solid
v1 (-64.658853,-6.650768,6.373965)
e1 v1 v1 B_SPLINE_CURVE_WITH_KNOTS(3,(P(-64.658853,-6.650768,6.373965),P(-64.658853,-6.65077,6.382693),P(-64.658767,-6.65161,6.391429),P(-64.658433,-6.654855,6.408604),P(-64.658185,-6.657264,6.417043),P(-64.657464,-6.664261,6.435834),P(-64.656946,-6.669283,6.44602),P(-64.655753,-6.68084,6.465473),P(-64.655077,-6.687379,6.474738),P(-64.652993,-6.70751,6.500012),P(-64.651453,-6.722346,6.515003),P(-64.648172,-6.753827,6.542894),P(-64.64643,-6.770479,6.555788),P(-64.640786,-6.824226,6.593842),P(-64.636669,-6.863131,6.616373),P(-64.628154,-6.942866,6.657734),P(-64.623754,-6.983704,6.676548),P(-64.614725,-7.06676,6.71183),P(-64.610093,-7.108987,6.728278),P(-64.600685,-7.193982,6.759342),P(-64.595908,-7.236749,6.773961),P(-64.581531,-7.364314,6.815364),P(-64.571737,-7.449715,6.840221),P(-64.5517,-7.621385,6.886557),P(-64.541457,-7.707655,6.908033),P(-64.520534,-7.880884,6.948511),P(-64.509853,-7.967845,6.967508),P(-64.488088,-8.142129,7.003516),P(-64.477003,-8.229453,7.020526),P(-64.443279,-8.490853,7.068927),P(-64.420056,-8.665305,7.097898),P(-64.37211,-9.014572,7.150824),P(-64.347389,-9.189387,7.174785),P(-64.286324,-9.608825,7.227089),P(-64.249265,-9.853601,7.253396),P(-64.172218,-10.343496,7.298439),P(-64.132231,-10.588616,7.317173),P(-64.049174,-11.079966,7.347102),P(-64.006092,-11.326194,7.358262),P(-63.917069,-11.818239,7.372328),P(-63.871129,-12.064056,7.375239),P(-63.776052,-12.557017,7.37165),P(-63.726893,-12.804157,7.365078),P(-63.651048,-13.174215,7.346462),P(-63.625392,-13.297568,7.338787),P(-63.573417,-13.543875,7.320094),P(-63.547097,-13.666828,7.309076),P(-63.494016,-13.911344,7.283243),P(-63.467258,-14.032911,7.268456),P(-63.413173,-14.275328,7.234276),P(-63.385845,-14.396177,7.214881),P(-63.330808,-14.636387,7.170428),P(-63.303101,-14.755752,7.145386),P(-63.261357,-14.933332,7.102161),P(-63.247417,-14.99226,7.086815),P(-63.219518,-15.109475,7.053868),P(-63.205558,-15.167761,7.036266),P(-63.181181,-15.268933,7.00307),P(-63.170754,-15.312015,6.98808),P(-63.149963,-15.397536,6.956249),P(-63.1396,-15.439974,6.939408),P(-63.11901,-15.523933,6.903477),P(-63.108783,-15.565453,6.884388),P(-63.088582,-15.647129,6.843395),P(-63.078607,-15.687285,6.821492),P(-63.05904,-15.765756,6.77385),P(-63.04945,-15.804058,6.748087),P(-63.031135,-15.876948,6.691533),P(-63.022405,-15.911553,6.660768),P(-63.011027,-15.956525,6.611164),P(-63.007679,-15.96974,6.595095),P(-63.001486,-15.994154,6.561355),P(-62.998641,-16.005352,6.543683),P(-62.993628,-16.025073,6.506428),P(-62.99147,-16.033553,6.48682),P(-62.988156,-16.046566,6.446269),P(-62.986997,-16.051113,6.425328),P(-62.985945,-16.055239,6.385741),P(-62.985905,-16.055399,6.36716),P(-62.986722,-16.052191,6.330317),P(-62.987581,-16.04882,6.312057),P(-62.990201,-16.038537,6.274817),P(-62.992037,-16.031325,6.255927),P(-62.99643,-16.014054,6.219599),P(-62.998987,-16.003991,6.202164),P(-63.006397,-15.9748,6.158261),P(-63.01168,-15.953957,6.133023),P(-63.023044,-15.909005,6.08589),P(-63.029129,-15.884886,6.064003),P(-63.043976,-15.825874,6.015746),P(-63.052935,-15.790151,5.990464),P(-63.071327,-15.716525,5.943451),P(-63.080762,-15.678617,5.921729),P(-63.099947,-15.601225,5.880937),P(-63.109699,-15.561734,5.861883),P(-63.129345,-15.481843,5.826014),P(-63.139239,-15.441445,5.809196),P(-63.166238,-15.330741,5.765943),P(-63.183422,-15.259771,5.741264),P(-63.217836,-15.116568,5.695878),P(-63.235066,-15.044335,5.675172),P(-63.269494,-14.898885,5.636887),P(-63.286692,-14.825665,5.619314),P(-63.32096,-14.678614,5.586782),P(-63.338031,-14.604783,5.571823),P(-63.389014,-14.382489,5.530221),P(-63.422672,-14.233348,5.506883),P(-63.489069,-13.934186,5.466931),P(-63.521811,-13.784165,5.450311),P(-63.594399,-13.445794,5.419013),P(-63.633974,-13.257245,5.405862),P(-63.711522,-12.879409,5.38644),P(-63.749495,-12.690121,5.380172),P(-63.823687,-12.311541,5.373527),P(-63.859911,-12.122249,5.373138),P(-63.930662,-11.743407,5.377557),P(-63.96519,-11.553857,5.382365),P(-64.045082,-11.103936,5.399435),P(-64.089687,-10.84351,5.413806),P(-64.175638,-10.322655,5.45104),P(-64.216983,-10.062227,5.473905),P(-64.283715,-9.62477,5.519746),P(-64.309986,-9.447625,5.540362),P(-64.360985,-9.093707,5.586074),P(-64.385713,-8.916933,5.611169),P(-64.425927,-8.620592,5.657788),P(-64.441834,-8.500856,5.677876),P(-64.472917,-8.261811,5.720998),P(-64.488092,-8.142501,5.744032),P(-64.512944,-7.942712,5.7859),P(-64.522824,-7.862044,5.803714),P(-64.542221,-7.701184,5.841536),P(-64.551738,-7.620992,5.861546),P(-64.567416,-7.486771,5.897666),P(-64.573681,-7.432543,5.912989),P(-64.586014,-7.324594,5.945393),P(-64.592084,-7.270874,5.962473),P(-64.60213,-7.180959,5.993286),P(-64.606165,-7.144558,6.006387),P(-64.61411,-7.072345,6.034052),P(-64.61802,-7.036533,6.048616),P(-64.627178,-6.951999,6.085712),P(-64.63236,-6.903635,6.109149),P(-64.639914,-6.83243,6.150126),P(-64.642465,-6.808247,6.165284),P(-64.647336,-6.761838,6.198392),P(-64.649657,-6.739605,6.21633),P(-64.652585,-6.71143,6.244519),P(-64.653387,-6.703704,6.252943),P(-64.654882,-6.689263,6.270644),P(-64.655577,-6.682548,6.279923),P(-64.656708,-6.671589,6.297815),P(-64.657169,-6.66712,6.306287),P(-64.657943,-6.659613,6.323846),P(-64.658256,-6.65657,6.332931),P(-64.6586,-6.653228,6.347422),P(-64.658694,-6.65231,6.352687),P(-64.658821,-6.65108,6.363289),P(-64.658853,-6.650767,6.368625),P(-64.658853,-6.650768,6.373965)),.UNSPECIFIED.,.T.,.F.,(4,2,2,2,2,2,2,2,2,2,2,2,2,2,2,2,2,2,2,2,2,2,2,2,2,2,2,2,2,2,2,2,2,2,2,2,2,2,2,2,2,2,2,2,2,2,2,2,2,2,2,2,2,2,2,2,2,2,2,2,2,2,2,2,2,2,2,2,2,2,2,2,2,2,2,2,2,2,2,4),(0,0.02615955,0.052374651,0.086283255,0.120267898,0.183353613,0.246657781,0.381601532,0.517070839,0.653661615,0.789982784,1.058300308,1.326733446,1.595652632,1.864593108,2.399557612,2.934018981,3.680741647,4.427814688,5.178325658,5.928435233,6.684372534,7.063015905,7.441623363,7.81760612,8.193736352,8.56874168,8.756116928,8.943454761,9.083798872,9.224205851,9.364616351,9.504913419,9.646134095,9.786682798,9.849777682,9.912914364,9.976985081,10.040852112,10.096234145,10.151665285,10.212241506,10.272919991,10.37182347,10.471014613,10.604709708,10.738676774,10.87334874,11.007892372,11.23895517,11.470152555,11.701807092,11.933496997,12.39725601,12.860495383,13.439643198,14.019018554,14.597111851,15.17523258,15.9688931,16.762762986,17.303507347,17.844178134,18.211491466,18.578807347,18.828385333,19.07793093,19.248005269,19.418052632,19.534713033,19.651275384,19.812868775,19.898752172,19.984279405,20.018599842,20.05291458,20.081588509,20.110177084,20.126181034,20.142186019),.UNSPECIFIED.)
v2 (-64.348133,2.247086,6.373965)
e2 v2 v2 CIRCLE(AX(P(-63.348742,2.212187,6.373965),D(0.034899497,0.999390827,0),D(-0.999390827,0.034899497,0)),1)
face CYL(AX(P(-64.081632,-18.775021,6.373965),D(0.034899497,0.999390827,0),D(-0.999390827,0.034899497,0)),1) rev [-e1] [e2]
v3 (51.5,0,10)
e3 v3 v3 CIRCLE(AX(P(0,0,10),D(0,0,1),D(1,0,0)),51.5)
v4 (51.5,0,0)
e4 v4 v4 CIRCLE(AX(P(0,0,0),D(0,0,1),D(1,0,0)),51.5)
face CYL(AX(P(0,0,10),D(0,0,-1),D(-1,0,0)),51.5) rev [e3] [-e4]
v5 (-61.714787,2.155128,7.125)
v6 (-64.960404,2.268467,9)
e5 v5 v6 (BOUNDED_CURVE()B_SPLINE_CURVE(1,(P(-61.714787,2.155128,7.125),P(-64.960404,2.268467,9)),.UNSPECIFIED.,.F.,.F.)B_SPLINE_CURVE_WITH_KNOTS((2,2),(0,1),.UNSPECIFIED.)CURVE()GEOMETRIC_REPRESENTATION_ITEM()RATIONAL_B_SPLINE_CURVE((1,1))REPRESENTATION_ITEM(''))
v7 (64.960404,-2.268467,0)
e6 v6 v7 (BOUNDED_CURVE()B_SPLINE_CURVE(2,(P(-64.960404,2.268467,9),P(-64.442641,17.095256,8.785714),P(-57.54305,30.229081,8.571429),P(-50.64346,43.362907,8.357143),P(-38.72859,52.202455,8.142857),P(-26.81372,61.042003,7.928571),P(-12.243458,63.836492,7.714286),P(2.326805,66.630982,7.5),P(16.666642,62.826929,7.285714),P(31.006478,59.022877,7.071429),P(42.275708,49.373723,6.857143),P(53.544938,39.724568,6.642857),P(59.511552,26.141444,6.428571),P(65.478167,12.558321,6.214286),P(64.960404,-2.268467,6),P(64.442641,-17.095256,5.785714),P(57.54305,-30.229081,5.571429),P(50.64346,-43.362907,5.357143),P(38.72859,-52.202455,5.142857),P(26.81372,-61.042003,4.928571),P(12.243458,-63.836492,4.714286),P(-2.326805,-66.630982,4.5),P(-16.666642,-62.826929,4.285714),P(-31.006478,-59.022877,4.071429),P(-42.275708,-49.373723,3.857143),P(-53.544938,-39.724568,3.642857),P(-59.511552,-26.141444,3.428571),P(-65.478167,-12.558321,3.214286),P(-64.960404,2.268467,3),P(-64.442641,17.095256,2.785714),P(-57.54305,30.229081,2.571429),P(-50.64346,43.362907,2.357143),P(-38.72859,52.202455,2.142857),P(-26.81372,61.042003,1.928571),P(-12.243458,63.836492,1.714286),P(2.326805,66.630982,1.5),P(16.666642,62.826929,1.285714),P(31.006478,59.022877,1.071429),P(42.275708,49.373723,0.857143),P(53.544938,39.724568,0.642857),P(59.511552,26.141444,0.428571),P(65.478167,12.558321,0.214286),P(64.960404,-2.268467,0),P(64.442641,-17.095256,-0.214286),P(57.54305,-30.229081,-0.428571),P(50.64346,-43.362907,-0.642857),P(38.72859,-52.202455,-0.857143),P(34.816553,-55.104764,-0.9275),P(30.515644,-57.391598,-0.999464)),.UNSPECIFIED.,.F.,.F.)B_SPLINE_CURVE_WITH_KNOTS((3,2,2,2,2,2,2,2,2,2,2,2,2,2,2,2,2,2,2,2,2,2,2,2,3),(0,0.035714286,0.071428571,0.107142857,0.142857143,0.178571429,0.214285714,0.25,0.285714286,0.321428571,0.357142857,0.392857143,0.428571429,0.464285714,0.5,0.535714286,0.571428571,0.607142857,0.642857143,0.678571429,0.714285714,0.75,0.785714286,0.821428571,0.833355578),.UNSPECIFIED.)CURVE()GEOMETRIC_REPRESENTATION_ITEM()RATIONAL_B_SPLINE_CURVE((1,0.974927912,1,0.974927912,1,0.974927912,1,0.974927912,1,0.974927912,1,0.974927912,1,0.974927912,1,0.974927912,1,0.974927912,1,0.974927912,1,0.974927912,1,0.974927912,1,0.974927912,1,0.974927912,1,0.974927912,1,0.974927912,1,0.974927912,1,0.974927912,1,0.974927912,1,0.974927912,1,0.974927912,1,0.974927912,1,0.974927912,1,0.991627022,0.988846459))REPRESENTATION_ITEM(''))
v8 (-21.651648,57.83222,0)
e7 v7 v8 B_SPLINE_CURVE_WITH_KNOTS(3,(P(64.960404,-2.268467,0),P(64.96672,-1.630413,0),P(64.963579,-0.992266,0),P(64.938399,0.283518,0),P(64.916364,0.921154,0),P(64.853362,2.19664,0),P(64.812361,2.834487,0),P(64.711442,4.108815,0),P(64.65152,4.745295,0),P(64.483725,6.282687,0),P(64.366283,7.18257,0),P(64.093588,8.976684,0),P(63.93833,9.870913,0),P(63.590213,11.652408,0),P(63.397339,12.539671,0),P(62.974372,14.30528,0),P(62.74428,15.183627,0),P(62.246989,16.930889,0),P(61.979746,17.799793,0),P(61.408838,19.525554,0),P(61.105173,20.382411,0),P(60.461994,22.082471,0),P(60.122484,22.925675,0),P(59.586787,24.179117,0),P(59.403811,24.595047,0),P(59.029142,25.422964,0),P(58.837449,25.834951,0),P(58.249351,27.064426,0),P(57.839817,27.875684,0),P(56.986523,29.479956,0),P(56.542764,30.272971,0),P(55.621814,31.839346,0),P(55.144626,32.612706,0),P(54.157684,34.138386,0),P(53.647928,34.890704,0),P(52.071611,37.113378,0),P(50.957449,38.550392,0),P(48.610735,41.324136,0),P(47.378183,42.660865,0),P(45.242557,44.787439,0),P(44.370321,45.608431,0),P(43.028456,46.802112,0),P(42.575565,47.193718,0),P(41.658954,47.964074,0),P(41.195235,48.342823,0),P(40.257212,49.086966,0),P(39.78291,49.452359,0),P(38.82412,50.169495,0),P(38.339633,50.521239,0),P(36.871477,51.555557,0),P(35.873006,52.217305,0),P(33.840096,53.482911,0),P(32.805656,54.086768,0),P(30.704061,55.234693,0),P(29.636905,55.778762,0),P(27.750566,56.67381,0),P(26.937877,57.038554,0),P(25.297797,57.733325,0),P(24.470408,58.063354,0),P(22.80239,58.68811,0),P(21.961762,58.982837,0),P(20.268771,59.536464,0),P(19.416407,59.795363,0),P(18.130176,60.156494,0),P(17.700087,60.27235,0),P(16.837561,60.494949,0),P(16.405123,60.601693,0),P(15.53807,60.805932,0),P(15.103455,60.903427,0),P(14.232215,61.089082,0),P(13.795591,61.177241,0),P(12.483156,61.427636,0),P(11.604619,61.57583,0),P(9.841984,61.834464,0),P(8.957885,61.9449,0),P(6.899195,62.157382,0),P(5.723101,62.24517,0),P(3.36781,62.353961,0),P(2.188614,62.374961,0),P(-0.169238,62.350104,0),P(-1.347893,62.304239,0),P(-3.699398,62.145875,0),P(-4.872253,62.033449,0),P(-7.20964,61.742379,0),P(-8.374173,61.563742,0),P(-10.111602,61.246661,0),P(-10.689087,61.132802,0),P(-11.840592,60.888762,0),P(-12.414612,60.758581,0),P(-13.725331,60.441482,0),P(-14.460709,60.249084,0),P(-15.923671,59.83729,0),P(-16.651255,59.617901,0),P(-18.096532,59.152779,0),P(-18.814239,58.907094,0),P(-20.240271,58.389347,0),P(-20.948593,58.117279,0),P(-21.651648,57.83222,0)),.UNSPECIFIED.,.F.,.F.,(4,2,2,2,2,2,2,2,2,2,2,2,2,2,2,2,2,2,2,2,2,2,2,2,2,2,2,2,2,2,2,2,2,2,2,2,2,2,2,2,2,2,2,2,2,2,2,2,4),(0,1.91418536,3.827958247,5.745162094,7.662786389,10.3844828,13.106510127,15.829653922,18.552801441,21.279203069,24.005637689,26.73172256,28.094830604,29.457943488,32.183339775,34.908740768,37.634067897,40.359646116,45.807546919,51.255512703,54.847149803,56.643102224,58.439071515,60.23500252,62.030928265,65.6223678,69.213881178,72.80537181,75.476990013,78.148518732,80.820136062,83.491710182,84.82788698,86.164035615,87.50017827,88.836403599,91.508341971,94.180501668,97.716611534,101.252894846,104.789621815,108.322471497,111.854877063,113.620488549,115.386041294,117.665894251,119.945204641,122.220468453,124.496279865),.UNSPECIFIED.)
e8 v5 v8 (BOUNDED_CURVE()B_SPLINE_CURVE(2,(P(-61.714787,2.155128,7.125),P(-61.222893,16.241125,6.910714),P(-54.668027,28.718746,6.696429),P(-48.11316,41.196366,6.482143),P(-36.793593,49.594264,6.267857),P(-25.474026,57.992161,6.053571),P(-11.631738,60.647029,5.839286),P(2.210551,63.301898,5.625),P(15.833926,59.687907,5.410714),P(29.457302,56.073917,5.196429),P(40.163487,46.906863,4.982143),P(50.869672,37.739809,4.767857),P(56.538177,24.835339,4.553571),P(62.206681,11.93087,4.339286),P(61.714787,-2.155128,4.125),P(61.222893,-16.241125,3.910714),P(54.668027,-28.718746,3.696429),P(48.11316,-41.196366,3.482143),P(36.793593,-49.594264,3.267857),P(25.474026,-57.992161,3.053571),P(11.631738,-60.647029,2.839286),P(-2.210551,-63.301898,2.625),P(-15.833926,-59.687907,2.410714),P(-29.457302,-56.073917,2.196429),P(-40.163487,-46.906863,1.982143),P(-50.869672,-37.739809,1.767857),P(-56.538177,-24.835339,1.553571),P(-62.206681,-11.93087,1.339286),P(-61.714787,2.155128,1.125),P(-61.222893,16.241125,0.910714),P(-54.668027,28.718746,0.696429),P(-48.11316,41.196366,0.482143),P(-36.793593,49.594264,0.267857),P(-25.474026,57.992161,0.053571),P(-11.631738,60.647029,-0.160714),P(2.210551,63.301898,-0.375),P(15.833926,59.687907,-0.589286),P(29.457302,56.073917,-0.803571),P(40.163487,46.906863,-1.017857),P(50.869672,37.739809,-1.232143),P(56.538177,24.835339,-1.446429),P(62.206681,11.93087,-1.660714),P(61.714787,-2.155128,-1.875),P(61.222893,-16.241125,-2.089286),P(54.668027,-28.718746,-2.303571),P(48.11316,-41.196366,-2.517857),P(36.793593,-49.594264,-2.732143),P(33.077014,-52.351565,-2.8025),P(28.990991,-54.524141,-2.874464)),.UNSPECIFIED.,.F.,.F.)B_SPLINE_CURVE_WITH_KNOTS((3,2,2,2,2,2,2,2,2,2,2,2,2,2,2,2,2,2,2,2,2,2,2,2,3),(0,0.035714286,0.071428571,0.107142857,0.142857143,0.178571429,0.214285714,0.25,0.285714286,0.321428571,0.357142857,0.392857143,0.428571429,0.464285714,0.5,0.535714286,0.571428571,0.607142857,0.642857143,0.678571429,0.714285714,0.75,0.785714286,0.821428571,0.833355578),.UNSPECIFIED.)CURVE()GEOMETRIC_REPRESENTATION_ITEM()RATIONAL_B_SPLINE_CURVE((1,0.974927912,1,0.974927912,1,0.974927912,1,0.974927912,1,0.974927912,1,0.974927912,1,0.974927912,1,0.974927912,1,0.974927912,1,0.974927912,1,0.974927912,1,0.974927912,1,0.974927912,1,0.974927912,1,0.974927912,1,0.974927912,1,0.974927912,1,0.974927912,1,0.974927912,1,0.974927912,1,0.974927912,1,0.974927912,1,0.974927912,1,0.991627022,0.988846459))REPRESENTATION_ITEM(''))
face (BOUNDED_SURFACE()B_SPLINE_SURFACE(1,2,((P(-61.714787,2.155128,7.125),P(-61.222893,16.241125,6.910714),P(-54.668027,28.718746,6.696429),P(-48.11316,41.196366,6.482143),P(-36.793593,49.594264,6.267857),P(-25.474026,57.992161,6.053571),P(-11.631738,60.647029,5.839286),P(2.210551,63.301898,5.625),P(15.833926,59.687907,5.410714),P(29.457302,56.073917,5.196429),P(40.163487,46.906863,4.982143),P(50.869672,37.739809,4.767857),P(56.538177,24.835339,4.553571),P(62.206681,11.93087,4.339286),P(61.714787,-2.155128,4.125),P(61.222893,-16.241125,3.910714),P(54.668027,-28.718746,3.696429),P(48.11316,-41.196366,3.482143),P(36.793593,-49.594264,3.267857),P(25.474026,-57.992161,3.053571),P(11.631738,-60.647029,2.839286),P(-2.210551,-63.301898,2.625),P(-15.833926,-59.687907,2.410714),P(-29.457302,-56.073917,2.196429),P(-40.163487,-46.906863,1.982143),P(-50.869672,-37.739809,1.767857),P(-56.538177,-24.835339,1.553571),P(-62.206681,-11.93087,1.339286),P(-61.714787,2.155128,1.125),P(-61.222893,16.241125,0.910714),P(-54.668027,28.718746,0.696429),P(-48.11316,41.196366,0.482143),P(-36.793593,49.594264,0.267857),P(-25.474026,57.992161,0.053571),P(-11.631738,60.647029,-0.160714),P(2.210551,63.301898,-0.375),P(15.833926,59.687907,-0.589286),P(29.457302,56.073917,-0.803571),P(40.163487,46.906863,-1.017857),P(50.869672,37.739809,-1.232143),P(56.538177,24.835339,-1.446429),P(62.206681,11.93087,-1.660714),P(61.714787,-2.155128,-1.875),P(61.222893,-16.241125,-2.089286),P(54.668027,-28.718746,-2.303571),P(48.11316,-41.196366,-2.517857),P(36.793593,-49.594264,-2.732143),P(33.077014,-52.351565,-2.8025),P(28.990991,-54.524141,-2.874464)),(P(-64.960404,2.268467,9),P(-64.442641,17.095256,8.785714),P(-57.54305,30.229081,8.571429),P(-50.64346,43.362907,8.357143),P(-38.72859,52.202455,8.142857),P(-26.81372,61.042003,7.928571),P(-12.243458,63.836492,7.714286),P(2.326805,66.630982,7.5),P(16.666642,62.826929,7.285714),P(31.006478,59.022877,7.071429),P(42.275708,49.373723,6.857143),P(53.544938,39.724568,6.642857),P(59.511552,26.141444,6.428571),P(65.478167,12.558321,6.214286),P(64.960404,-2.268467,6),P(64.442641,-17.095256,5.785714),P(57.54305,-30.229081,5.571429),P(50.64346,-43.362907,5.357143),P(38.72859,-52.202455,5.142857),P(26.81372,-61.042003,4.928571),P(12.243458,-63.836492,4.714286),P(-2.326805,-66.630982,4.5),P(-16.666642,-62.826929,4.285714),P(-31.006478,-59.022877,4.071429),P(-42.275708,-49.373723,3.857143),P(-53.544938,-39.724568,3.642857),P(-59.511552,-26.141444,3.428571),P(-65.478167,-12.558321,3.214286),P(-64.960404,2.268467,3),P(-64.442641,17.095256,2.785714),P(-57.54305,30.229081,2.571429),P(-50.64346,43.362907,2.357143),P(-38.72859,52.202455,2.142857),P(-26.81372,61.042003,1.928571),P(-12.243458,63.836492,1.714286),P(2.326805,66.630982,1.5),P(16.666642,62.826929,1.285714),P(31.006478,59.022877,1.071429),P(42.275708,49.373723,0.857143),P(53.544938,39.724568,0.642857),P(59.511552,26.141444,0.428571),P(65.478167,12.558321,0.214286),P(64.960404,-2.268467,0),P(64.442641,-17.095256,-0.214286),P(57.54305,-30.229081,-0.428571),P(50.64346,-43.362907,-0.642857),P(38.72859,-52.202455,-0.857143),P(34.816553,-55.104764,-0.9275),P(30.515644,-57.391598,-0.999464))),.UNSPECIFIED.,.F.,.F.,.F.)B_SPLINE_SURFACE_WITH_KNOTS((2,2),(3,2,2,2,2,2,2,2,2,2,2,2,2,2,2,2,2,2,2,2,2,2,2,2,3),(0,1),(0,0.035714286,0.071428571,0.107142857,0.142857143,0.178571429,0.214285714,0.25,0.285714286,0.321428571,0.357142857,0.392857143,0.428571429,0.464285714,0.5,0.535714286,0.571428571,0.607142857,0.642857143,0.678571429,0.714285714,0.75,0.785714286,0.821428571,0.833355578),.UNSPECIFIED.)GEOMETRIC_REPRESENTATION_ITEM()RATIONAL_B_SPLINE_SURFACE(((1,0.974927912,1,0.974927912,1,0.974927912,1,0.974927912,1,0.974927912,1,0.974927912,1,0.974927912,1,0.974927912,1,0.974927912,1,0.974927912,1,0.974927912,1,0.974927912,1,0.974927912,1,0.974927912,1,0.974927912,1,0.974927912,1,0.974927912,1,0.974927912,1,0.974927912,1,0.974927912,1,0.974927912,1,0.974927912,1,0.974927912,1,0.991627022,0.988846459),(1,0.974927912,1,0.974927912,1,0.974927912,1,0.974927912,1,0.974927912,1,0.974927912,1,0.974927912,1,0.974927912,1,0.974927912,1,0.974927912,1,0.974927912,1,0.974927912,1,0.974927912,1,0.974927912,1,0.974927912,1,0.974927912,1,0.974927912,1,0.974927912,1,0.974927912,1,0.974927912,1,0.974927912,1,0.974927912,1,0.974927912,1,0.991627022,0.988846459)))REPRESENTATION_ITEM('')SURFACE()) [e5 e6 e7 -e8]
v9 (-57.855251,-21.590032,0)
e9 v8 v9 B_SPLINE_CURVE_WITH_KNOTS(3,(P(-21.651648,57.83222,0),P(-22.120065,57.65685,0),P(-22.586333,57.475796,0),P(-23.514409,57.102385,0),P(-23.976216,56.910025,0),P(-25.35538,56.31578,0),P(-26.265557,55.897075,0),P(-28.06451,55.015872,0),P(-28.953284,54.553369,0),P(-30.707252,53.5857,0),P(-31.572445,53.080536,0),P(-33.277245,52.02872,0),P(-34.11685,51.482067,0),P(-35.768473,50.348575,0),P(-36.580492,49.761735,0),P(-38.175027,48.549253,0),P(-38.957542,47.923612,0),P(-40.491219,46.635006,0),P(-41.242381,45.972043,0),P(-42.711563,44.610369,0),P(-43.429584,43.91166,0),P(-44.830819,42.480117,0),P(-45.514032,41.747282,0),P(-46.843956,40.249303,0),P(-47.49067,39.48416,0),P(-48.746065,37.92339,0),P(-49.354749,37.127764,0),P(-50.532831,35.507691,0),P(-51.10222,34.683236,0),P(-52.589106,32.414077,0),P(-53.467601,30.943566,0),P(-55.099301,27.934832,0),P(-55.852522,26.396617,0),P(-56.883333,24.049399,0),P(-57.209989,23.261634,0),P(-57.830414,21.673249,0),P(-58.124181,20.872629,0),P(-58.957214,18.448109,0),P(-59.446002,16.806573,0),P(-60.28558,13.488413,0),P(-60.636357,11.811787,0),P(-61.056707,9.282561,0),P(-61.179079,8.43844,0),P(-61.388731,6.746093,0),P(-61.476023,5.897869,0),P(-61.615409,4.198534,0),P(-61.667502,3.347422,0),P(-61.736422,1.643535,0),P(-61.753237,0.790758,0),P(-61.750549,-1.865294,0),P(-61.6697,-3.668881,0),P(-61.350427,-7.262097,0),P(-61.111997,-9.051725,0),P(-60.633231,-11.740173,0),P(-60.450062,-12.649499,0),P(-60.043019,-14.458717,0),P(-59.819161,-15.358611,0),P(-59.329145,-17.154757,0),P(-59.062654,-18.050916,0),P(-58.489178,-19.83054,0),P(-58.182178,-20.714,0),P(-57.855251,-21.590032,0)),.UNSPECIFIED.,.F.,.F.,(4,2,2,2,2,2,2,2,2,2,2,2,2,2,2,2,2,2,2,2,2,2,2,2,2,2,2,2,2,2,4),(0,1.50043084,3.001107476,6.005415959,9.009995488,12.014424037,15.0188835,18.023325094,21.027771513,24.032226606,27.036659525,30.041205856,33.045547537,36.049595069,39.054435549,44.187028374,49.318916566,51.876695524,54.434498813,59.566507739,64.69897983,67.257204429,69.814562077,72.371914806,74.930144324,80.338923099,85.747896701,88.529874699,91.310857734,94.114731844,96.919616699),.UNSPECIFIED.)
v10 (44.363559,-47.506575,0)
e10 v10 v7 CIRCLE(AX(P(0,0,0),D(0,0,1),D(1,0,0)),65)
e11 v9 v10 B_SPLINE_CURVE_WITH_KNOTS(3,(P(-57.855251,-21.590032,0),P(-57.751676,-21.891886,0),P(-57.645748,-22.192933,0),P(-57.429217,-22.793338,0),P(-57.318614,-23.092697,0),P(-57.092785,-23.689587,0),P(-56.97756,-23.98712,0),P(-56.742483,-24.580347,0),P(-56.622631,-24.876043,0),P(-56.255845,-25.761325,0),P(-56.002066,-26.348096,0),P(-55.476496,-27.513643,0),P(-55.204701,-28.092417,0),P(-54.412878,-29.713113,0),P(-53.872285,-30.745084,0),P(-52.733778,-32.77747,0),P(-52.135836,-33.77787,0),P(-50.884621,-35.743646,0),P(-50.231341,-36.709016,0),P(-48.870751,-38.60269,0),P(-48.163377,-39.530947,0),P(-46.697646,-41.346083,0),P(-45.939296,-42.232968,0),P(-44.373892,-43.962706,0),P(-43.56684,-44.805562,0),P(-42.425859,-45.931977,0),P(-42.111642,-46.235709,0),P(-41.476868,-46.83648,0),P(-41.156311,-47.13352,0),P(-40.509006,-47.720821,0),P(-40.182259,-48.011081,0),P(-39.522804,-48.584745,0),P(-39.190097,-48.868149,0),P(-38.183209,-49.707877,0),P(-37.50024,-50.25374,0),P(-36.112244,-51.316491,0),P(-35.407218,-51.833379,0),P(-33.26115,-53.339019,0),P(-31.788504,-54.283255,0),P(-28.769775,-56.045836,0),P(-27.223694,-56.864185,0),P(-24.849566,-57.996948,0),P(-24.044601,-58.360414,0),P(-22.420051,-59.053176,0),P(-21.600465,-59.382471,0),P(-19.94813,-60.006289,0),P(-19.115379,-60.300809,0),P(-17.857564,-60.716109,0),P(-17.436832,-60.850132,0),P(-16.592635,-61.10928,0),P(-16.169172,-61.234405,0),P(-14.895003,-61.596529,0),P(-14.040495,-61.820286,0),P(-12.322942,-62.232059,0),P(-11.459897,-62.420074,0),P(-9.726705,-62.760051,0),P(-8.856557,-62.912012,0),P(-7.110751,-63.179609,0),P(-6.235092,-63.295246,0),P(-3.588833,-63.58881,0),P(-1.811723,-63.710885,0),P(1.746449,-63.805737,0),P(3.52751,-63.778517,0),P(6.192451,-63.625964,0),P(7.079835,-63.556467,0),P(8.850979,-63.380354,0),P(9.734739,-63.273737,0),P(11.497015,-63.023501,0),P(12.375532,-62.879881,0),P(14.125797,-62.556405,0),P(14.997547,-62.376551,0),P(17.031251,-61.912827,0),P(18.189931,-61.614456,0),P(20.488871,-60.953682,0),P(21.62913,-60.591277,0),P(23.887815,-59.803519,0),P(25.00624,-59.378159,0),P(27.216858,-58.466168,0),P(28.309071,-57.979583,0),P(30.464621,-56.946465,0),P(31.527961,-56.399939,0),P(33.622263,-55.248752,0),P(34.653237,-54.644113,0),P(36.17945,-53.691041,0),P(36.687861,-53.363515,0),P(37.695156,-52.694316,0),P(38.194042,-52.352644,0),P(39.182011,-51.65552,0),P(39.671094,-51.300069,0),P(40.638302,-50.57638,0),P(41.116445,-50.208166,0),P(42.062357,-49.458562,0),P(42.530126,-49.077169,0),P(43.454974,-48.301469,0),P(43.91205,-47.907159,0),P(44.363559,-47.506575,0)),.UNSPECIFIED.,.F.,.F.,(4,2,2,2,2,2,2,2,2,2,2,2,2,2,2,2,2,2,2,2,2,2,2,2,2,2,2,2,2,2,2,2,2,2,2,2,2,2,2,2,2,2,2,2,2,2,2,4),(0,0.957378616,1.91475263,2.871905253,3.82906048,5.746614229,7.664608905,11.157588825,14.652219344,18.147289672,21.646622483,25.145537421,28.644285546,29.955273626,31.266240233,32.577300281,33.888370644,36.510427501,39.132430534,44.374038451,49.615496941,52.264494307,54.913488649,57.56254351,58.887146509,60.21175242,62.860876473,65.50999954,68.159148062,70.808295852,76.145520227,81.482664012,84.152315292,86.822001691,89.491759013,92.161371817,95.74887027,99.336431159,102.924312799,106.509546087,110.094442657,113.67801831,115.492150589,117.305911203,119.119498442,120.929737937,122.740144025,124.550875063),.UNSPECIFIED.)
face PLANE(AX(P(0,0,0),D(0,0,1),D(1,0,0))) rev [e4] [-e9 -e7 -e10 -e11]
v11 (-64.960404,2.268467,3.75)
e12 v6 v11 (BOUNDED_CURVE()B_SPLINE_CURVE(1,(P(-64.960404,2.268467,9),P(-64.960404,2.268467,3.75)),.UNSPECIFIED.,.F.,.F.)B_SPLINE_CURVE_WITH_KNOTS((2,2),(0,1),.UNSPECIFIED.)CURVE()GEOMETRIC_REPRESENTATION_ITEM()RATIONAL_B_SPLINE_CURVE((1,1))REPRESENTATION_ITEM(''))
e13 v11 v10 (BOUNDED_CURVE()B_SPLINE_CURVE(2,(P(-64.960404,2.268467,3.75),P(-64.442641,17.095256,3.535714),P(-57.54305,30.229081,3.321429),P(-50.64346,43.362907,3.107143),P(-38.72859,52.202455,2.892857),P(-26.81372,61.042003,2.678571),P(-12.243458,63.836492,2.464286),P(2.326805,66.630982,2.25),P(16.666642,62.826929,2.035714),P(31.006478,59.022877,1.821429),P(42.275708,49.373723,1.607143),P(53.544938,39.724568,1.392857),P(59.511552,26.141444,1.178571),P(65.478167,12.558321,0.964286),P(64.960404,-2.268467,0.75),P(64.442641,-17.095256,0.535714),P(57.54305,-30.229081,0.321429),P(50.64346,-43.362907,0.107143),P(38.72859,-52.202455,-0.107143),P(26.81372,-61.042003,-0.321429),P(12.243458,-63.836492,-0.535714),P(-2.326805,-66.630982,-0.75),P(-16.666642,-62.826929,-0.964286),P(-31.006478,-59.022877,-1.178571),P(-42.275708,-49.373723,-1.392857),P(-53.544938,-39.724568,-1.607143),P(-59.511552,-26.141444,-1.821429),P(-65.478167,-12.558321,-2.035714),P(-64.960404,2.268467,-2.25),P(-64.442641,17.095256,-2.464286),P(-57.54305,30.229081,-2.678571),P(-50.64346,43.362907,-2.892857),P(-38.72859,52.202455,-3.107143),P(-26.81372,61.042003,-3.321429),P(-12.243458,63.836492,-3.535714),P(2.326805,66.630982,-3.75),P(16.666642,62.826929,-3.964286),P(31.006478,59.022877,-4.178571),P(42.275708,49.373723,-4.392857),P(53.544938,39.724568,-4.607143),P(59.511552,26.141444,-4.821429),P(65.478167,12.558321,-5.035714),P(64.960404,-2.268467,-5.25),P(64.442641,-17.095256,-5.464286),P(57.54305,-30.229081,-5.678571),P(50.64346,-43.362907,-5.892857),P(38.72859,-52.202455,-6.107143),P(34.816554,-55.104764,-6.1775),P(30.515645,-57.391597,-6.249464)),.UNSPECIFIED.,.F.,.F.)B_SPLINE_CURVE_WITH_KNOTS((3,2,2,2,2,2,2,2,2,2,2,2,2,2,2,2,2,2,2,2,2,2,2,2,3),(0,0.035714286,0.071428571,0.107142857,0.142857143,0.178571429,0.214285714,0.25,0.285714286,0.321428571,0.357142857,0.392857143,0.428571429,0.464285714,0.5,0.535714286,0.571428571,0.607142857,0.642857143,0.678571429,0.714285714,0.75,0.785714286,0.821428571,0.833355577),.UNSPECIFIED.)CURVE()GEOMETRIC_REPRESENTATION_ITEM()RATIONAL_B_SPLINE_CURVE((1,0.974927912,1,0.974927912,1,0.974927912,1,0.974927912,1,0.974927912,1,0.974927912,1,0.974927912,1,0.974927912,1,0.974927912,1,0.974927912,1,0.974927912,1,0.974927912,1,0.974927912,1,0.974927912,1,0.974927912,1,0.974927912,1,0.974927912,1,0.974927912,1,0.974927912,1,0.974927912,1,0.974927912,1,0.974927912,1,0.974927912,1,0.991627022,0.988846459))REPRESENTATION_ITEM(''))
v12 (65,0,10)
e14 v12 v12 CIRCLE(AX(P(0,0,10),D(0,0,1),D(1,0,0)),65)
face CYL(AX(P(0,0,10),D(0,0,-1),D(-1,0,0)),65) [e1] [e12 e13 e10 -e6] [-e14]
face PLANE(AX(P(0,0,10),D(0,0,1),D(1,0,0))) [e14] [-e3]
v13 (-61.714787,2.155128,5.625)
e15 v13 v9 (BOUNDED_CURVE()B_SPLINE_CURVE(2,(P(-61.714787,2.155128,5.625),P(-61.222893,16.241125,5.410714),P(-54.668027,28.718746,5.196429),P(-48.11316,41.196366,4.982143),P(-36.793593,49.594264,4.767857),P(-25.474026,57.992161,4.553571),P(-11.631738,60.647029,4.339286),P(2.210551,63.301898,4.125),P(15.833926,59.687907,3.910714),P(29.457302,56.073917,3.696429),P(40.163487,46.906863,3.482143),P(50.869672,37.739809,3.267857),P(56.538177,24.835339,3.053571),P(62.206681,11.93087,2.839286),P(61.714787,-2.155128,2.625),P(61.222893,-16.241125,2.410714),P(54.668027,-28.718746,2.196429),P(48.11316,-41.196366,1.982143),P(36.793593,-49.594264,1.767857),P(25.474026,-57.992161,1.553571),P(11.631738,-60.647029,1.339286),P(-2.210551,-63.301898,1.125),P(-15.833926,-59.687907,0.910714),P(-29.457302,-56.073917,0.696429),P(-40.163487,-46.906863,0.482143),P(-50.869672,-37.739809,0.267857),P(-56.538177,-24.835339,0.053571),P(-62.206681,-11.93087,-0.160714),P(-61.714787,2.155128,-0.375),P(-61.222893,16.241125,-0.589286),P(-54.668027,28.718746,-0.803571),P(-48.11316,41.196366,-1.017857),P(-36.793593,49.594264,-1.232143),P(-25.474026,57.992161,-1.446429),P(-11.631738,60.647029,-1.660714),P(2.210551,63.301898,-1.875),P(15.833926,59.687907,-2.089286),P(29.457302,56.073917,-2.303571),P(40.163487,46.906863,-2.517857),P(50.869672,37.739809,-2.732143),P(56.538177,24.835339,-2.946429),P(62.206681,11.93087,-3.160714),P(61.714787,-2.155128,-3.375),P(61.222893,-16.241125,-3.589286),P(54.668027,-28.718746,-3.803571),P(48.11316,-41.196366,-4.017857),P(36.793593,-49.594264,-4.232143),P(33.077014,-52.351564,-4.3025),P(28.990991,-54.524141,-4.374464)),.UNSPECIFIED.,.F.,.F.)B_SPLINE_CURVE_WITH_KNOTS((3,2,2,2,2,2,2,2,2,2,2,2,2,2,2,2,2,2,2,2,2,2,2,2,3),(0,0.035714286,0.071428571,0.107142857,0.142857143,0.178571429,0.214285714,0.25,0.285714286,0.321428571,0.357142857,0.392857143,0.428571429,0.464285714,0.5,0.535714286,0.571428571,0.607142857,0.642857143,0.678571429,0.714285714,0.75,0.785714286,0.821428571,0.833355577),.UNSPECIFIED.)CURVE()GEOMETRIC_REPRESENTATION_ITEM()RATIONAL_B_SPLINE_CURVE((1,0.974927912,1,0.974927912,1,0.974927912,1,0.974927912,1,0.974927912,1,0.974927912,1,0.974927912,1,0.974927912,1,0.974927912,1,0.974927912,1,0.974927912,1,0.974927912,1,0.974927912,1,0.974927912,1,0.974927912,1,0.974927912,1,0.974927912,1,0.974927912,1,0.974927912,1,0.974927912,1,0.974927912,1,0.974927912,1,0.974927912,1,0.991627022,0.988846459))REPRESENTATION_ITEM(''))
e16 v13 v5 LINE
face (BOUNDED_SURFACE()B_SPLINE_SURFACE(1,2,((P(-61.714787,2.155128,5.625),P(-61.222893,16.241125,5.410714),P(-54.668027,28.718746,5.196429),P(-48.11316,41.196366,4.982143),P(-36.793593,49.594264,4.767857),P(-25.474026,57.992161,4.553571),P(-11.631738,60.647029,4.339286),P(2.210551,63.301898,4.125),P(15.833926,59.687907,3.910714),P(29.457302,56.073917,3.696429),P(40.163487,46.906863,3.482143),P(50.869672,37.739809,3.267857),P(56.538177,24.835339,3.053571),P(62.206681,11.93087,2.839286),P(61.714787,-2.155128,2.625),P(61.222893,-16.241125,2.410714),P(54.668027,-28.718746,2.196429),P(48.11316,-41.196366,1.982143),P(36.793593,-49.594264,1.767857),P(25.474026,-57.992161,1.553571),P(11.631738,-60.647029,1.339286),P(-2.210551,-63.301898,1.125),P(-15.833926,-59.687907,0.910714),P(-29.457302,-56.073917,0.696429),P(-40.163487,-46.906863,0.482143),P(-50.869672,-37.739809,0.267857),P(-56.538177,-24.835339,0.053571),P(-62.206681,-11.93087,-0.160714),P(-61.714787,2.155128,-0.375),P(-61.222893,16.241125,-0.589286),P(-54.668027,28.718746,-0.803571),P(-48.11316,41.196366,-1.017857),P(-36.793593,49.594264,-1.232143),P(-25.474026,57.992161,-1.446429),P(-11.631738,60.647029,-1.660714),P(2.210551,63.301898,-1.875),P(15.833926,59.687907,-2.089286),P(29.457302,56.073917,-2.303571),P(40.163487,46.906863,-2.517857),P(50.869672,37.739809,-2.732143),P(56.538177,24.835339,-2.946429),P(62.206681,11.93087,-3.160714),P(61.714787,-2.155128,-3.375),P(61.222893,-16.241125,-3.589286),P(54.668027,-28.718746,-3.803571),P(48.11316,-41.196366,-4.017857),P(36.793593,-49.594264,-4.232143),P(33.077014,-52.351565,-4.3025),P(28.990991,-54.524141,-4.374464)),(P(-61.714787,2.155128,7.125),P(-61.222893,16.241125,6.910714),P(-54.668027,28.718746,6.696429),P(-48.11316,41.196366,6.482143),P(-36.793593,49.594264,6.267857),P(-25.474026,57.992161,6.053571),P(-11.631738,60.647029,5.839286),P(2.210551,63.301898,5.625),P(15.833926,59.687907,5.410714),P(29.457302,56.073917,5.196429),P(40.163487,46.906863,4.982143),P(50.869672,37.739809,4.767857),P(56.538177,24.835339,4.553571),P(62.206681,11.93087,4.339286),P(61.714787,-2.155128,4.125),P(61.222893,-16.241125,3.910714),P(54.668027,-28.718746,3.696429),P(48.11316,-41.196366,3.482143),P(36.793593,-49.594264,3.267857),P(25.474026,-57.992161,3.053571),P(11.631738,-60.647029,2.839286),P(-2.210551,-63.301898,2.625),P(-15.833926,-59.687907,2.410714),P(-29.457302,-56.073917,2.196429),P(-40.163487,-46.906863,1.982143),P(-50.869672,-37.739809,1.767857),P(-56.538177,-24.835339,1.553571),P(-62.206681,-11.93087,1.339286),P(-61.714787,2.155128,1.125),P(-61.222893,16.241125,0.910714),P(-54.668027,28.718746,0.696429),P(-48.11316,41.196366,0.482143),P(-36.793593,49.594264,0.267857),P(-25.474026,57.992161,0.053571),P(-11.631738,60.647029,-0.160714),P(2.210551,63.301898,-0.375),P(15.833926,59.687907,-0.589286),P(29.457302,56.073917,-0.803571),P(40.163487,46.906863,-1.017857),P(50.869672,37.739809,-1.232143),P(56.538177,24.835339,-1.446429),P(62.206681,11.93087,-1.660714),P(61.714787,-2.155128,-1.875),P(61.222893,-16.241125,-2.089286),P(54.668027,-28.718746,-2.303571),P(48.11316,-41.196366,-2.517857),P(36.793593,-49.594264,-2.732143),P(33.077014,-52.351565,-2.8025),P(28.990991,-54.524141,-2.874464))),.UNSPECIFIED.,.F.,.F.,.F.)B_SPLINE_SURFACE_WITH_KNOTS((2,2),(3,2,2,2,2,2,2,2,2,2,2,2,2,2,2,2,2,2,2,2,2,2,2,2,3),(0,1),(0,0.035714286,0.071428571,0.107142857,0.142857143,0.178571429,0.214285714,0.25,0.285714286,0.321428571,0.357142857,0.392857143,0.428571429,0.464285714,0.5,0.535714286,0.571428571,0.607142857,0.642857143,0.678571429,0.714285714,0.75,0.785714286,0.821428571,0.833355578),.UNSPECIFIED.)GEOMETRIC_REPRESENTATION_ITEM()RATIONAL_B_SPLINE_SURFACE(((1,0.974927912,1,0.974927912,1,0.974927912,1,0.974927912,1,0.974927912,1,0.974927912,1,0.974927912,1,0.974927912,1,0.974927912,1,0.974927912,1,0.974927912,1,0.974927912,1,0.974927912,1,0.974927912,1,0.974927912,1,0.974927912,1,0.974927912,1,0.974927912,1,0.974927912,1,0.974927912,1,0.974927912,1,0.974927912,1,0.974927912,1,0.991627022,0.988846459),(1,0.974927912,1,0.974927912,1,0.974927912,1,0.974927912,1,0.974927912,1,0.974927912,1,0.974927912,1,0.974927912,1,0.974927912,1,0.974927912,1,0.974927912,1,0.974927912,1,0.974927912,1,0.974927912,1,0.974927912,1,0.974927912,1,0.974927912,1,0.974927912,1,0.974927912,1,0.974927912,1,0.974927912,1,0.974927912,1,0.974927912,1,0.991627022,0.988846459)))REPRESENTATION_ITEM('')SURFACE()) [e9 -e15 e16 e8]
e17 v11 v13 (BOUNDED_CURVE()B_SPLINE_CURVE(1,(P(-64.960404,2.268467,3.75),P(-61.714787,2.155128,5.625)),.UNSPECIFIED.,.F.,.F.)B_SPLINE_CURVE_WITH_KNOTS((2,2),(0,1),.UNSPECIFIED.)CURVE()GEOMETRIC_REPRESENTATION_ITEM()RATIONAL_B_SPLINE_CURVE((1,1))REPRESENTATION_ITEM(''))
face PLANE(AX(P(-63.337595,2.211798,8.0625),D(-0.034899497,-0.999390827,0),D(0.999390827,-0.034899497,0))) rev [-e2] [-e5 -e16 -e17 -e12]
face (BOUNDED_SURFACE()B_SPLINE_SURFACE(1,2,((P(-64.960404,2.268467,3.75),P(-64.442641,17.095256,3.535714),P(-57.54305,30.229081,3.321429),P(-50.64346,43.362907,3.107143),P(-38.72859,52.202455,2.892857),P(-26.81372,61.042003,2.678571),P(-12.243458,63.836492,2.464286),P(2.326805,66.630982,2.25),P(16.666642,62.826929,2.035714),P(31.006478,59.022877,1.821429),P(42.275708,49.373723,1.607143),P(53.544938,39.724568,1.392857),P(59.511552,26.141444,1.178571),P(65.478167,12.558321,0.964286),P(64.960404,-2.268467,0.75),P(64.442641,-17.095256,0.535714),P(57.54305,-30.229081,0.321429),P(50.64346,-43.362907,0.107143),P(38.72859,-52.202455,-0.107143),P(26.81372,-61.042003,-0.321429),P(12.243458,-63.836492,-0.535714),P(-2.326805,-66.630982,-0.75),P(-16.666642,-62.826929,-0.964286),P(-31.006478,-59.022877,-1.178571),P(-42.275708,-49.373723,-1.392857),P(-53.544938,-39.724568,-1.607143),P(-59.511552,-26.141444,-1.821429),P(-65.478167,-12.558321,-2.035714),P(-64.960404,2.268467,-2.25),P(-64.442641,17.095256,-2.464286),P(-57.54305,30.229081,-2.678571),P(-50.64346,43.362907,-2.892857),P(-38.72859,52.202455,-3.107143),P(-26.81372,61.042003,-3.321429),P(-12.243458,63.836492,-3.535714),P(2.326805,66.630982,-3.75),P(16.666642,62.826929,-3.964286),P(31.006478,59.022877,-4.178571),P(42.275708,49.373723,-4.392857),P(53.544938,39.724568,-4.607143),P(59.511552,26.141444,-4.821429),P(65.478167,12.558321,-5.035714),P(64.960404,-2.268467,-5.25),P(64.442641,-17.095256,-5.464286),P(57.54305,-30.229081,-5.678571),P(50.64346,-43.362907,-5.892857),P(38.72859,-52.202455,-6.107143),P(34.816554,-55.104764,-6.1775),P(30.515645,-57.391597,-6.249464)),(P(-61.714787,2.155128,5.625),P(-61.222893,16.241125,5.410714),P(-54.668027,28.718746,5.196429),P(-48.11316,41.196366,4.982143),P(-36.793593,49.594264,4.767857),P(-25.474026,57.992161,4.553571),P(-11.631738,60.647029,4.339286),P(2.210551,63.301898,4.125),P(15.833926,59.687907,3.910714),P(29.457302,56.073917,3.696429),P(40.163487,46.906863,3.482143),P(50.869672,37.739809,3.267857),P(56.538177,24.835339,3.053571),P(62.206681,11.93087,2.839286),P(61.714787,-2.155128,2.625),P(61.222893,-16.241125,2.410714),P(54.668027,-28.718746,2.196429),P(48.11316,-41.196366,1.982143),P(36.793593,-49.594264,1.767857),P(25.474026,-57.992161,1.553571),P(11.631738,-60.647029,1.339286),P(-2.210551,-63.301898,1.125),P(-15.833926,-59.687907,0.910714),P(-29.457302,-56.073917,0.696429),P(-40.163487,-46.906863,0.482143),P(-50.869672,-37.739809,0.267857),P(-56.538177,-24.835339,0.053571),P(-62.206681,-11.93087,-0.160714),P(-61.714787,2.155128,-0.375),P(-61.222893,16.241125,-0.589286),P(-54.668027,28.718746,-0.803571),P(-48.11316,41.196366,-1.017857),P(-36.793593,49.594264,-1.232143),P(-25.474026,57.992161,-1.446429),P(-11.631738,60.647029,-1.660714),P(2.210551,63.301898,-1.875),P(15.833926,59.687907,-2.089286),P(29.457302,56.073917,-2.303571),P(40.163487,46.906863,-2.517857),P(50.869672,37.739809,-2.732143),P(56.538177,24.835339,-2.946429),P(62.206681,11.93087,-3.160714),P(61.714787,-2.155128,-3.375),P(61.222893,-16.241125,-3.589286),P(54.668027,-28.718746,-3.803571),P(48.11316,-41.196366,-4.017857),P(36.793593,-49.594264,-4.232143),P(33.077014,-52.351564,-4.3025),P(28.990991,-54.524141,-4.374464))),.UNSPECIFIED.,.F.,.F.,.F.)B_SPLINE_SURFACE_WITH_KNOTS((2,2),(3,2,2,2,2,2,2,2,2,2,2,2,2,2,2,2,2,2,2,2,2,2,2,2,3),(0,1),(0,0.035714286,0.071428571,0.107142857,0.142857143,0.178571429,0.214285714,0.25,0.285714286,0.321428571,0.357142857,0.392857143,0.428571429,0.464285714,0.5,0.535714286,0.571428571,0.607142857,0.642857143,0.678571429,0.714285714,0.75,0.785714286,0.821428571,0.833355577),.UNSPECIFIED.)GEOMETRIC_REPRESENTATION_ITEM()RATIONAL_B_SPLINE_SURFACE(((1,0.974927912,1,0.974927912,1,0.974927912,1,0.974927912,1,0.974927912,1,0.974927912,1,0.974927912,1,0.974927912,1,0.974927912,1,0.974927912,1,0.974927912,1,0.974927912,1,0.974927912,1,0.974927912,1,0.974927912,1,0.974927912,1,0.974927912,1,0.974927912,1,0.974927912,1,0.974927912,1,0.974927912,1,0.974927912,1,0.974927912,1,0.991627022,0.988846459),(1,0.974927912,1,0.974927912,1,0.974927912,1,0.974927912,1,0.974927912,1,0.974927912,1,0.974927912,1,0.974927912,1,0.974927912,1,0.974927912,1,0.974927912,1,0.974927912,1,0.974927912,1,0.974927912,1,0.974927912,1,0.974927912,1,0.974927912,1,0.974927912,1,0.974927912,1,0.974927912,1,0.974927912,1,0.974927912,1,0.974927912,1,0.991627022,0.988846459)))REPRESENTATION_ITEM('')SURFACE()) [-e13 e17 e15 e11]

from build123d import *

# Parameters (mm, degrees)
SKETCH1_R           = 65
SKETCH1_R_2         = 51.5
BOSS_EXTRUDE1_DEPTH = 10
THREAD1_PITCH       = 6
SKETCH10_R          = 1
CUT_EXTRUDE1_DEPTH  = 21


with BuildPart() as part:
    # Sketch1 → Boss-Extrude1 (new body)
    with BuildSketch(Plane.XY):
        Circle(SKETCH1_R)
        Circle(SKETCH1_R_2, mode=Mode.SUBTRACT)
    extrude(amount=BOSS_EXTRUDE1_DEPTH)

    # Thread1: the profile of Thread Profile1 profile screwed along a right-hand helix of 1.5 turns, 14 arcs to a turn; built about Z, then put on its axis
    thread1_z = Axis((0, 0, 0), (0, 0, 1))
    thread1_corners = [(65.0003, -1.9e-08, -0.000173205), (65.0003, -1.9e-08, 5.250173189), (61.75240475, -1.8e-08, 3.374999992), (61.75240475, -1.8e-08, 1.874999992)]
    with BuildLine(mode=Mode.PRIVATE) as thread1_profile:
        Line(thread1_corners[0], thread1_corners[1])
        Line(thread1_corners[1], thread1_corners[2])
        Line(thread1_corners[2], thread1_corners[3])
        Line(thread1_corners[3], thread1_corners[0])
    thread1_cap = Face(thread1_profile.wire())
    thread1_turn_angles = [0, 12.857142857, 25.714285714, 38.571428571, 51.428571429, 64.285714286, 77.142857143, 90, 102.857142857, 115.714285714, 128.571428571, 141.428571429, 154.285714286, 167.142857143, 180, 192.857142857, 205.714285714, 218.571428571, 231.428571429, 244.285714286, 257.142857143, 270, 282.857142857, 295.714285714, 308.571428571, 321.428571429, 334.285714286, 347.142857143, 360]
    thread1_turn_weights = [1, 0.9749279121818236, 1, 0.9749279121818236, 1, 0.9749279121818236, 1, 0.9749279121818236, 1, 0.9749279121818236, 1, 0.9749279121818236, 1, 0.9749279121818236, 1, 0.9749279121818236, 1, 0.9749279121818236, 1, 0.9749279121818236, 1, 0.9749279121818236, 1, 0.9749279121818237, 1, 0.9749279121818236, 1, 0.9749279121818236, 1]
    thread1_turn_rails = [Edge.make_bspline([Vector(p[0], p[1], 0).rotate(thread1_z, thread1_turn_angles[k]) / thread1_turn_weights[k] + Vector(0, 0, p[2] + THREAD1_PITCH * thread1_turn_angles[k] / 360) for k in range(29)], [0, 0, 0, 1, 1, 2, 2, 3, 3, 4, 4, 5, 5, 6, 6, 7, 7, 8, 8, 9, 9, 10, 10, 11, 11, 12, 12, 13, 13, 14, 14, 14], 2, thread1_turn_weights) for p in thread1_corners]
    thread1_turn_sides = [Face.make_surface_from_curves(thread1_turn_rails[p[0]], thread1_turn_rails[p[1]]) for p in [(0, 1), (1, 2), (2, 3), (3, 0)]]
    thread1_last_angles = [360, 372.857142857, 385.714285714, 398.571428571, 411.428571429, 424.285714286, 437.142857143, 450, 462.857142857, 475.714285714, 488.571428571, 501.428571429, 514.285714286, 527.142857143, 540]
    thread1_last_weights = [1, 0.9749279121818236, 1, 0.9749279121818236, 1, 0.9749279121818237, 1, 0.9749279121818235, 1, 0.9749279121818237, 1, 0.9749279121818237, 1, 0.9749279121818235, 1]
    thread1_last_rails = [Edge.make_bspline([Vector(p[0], p[1], 0).rotate(thread1_z, thread1_last_angles[k]) / thread1_last_weights[k] + Vector(0, 0, p[2] + THREAD1_PITCH * thread1_last_angles[k] / 360) for k in range(15)], [0, 0, 0, 1, 1, 2, 2, 3, 3, 4, 4, 5, 5, 6, 6, 7, 7, 7], 2, thread1_last_weights) for p in thread1_corners]
    thread1_last_sides = [Face.make_surface_from_curves(thread1_last_rails[p[0]], thread1_last_rails[p[1]]) for p in [(0, 1), (1, 2), (2, 3), (3, 0)]]
    thread1 = Plane(origin=(0, 0, 9), x_dir=(-0.999390827, 0.034899497, 0), z_dir=(0, 0, -1)) * Solid(Shell([*thread1_turn_sides, *thread1_last_sides, thread1_cap, thread1_cap.rotate(thread1_z, 540).moved(Location((0, 0, THREAD1_PITCH * 540 / 360)))]))
    add(thread1, mode=Mode.SUBTRACT)

    # Sketch10 → Cut-Extrude1 (cut)
    with BuildSketch(Plane(origin=(0, 0, 0), x_dir=(0.9993908270190958, -0.03489949670250096, 0), z_dir=(0.03489949670250096, 0.9993908270190958, 0))):
        with Locations(Location((-63.387356221, -6.373965218, 0), (0, 0, 180))):
            Circle(SKETCH10_R)
    extrude(amount=-CUT_EXTRUDE1_DEPTH, mode=Mode.SUBTRACT)


solid = part.part
